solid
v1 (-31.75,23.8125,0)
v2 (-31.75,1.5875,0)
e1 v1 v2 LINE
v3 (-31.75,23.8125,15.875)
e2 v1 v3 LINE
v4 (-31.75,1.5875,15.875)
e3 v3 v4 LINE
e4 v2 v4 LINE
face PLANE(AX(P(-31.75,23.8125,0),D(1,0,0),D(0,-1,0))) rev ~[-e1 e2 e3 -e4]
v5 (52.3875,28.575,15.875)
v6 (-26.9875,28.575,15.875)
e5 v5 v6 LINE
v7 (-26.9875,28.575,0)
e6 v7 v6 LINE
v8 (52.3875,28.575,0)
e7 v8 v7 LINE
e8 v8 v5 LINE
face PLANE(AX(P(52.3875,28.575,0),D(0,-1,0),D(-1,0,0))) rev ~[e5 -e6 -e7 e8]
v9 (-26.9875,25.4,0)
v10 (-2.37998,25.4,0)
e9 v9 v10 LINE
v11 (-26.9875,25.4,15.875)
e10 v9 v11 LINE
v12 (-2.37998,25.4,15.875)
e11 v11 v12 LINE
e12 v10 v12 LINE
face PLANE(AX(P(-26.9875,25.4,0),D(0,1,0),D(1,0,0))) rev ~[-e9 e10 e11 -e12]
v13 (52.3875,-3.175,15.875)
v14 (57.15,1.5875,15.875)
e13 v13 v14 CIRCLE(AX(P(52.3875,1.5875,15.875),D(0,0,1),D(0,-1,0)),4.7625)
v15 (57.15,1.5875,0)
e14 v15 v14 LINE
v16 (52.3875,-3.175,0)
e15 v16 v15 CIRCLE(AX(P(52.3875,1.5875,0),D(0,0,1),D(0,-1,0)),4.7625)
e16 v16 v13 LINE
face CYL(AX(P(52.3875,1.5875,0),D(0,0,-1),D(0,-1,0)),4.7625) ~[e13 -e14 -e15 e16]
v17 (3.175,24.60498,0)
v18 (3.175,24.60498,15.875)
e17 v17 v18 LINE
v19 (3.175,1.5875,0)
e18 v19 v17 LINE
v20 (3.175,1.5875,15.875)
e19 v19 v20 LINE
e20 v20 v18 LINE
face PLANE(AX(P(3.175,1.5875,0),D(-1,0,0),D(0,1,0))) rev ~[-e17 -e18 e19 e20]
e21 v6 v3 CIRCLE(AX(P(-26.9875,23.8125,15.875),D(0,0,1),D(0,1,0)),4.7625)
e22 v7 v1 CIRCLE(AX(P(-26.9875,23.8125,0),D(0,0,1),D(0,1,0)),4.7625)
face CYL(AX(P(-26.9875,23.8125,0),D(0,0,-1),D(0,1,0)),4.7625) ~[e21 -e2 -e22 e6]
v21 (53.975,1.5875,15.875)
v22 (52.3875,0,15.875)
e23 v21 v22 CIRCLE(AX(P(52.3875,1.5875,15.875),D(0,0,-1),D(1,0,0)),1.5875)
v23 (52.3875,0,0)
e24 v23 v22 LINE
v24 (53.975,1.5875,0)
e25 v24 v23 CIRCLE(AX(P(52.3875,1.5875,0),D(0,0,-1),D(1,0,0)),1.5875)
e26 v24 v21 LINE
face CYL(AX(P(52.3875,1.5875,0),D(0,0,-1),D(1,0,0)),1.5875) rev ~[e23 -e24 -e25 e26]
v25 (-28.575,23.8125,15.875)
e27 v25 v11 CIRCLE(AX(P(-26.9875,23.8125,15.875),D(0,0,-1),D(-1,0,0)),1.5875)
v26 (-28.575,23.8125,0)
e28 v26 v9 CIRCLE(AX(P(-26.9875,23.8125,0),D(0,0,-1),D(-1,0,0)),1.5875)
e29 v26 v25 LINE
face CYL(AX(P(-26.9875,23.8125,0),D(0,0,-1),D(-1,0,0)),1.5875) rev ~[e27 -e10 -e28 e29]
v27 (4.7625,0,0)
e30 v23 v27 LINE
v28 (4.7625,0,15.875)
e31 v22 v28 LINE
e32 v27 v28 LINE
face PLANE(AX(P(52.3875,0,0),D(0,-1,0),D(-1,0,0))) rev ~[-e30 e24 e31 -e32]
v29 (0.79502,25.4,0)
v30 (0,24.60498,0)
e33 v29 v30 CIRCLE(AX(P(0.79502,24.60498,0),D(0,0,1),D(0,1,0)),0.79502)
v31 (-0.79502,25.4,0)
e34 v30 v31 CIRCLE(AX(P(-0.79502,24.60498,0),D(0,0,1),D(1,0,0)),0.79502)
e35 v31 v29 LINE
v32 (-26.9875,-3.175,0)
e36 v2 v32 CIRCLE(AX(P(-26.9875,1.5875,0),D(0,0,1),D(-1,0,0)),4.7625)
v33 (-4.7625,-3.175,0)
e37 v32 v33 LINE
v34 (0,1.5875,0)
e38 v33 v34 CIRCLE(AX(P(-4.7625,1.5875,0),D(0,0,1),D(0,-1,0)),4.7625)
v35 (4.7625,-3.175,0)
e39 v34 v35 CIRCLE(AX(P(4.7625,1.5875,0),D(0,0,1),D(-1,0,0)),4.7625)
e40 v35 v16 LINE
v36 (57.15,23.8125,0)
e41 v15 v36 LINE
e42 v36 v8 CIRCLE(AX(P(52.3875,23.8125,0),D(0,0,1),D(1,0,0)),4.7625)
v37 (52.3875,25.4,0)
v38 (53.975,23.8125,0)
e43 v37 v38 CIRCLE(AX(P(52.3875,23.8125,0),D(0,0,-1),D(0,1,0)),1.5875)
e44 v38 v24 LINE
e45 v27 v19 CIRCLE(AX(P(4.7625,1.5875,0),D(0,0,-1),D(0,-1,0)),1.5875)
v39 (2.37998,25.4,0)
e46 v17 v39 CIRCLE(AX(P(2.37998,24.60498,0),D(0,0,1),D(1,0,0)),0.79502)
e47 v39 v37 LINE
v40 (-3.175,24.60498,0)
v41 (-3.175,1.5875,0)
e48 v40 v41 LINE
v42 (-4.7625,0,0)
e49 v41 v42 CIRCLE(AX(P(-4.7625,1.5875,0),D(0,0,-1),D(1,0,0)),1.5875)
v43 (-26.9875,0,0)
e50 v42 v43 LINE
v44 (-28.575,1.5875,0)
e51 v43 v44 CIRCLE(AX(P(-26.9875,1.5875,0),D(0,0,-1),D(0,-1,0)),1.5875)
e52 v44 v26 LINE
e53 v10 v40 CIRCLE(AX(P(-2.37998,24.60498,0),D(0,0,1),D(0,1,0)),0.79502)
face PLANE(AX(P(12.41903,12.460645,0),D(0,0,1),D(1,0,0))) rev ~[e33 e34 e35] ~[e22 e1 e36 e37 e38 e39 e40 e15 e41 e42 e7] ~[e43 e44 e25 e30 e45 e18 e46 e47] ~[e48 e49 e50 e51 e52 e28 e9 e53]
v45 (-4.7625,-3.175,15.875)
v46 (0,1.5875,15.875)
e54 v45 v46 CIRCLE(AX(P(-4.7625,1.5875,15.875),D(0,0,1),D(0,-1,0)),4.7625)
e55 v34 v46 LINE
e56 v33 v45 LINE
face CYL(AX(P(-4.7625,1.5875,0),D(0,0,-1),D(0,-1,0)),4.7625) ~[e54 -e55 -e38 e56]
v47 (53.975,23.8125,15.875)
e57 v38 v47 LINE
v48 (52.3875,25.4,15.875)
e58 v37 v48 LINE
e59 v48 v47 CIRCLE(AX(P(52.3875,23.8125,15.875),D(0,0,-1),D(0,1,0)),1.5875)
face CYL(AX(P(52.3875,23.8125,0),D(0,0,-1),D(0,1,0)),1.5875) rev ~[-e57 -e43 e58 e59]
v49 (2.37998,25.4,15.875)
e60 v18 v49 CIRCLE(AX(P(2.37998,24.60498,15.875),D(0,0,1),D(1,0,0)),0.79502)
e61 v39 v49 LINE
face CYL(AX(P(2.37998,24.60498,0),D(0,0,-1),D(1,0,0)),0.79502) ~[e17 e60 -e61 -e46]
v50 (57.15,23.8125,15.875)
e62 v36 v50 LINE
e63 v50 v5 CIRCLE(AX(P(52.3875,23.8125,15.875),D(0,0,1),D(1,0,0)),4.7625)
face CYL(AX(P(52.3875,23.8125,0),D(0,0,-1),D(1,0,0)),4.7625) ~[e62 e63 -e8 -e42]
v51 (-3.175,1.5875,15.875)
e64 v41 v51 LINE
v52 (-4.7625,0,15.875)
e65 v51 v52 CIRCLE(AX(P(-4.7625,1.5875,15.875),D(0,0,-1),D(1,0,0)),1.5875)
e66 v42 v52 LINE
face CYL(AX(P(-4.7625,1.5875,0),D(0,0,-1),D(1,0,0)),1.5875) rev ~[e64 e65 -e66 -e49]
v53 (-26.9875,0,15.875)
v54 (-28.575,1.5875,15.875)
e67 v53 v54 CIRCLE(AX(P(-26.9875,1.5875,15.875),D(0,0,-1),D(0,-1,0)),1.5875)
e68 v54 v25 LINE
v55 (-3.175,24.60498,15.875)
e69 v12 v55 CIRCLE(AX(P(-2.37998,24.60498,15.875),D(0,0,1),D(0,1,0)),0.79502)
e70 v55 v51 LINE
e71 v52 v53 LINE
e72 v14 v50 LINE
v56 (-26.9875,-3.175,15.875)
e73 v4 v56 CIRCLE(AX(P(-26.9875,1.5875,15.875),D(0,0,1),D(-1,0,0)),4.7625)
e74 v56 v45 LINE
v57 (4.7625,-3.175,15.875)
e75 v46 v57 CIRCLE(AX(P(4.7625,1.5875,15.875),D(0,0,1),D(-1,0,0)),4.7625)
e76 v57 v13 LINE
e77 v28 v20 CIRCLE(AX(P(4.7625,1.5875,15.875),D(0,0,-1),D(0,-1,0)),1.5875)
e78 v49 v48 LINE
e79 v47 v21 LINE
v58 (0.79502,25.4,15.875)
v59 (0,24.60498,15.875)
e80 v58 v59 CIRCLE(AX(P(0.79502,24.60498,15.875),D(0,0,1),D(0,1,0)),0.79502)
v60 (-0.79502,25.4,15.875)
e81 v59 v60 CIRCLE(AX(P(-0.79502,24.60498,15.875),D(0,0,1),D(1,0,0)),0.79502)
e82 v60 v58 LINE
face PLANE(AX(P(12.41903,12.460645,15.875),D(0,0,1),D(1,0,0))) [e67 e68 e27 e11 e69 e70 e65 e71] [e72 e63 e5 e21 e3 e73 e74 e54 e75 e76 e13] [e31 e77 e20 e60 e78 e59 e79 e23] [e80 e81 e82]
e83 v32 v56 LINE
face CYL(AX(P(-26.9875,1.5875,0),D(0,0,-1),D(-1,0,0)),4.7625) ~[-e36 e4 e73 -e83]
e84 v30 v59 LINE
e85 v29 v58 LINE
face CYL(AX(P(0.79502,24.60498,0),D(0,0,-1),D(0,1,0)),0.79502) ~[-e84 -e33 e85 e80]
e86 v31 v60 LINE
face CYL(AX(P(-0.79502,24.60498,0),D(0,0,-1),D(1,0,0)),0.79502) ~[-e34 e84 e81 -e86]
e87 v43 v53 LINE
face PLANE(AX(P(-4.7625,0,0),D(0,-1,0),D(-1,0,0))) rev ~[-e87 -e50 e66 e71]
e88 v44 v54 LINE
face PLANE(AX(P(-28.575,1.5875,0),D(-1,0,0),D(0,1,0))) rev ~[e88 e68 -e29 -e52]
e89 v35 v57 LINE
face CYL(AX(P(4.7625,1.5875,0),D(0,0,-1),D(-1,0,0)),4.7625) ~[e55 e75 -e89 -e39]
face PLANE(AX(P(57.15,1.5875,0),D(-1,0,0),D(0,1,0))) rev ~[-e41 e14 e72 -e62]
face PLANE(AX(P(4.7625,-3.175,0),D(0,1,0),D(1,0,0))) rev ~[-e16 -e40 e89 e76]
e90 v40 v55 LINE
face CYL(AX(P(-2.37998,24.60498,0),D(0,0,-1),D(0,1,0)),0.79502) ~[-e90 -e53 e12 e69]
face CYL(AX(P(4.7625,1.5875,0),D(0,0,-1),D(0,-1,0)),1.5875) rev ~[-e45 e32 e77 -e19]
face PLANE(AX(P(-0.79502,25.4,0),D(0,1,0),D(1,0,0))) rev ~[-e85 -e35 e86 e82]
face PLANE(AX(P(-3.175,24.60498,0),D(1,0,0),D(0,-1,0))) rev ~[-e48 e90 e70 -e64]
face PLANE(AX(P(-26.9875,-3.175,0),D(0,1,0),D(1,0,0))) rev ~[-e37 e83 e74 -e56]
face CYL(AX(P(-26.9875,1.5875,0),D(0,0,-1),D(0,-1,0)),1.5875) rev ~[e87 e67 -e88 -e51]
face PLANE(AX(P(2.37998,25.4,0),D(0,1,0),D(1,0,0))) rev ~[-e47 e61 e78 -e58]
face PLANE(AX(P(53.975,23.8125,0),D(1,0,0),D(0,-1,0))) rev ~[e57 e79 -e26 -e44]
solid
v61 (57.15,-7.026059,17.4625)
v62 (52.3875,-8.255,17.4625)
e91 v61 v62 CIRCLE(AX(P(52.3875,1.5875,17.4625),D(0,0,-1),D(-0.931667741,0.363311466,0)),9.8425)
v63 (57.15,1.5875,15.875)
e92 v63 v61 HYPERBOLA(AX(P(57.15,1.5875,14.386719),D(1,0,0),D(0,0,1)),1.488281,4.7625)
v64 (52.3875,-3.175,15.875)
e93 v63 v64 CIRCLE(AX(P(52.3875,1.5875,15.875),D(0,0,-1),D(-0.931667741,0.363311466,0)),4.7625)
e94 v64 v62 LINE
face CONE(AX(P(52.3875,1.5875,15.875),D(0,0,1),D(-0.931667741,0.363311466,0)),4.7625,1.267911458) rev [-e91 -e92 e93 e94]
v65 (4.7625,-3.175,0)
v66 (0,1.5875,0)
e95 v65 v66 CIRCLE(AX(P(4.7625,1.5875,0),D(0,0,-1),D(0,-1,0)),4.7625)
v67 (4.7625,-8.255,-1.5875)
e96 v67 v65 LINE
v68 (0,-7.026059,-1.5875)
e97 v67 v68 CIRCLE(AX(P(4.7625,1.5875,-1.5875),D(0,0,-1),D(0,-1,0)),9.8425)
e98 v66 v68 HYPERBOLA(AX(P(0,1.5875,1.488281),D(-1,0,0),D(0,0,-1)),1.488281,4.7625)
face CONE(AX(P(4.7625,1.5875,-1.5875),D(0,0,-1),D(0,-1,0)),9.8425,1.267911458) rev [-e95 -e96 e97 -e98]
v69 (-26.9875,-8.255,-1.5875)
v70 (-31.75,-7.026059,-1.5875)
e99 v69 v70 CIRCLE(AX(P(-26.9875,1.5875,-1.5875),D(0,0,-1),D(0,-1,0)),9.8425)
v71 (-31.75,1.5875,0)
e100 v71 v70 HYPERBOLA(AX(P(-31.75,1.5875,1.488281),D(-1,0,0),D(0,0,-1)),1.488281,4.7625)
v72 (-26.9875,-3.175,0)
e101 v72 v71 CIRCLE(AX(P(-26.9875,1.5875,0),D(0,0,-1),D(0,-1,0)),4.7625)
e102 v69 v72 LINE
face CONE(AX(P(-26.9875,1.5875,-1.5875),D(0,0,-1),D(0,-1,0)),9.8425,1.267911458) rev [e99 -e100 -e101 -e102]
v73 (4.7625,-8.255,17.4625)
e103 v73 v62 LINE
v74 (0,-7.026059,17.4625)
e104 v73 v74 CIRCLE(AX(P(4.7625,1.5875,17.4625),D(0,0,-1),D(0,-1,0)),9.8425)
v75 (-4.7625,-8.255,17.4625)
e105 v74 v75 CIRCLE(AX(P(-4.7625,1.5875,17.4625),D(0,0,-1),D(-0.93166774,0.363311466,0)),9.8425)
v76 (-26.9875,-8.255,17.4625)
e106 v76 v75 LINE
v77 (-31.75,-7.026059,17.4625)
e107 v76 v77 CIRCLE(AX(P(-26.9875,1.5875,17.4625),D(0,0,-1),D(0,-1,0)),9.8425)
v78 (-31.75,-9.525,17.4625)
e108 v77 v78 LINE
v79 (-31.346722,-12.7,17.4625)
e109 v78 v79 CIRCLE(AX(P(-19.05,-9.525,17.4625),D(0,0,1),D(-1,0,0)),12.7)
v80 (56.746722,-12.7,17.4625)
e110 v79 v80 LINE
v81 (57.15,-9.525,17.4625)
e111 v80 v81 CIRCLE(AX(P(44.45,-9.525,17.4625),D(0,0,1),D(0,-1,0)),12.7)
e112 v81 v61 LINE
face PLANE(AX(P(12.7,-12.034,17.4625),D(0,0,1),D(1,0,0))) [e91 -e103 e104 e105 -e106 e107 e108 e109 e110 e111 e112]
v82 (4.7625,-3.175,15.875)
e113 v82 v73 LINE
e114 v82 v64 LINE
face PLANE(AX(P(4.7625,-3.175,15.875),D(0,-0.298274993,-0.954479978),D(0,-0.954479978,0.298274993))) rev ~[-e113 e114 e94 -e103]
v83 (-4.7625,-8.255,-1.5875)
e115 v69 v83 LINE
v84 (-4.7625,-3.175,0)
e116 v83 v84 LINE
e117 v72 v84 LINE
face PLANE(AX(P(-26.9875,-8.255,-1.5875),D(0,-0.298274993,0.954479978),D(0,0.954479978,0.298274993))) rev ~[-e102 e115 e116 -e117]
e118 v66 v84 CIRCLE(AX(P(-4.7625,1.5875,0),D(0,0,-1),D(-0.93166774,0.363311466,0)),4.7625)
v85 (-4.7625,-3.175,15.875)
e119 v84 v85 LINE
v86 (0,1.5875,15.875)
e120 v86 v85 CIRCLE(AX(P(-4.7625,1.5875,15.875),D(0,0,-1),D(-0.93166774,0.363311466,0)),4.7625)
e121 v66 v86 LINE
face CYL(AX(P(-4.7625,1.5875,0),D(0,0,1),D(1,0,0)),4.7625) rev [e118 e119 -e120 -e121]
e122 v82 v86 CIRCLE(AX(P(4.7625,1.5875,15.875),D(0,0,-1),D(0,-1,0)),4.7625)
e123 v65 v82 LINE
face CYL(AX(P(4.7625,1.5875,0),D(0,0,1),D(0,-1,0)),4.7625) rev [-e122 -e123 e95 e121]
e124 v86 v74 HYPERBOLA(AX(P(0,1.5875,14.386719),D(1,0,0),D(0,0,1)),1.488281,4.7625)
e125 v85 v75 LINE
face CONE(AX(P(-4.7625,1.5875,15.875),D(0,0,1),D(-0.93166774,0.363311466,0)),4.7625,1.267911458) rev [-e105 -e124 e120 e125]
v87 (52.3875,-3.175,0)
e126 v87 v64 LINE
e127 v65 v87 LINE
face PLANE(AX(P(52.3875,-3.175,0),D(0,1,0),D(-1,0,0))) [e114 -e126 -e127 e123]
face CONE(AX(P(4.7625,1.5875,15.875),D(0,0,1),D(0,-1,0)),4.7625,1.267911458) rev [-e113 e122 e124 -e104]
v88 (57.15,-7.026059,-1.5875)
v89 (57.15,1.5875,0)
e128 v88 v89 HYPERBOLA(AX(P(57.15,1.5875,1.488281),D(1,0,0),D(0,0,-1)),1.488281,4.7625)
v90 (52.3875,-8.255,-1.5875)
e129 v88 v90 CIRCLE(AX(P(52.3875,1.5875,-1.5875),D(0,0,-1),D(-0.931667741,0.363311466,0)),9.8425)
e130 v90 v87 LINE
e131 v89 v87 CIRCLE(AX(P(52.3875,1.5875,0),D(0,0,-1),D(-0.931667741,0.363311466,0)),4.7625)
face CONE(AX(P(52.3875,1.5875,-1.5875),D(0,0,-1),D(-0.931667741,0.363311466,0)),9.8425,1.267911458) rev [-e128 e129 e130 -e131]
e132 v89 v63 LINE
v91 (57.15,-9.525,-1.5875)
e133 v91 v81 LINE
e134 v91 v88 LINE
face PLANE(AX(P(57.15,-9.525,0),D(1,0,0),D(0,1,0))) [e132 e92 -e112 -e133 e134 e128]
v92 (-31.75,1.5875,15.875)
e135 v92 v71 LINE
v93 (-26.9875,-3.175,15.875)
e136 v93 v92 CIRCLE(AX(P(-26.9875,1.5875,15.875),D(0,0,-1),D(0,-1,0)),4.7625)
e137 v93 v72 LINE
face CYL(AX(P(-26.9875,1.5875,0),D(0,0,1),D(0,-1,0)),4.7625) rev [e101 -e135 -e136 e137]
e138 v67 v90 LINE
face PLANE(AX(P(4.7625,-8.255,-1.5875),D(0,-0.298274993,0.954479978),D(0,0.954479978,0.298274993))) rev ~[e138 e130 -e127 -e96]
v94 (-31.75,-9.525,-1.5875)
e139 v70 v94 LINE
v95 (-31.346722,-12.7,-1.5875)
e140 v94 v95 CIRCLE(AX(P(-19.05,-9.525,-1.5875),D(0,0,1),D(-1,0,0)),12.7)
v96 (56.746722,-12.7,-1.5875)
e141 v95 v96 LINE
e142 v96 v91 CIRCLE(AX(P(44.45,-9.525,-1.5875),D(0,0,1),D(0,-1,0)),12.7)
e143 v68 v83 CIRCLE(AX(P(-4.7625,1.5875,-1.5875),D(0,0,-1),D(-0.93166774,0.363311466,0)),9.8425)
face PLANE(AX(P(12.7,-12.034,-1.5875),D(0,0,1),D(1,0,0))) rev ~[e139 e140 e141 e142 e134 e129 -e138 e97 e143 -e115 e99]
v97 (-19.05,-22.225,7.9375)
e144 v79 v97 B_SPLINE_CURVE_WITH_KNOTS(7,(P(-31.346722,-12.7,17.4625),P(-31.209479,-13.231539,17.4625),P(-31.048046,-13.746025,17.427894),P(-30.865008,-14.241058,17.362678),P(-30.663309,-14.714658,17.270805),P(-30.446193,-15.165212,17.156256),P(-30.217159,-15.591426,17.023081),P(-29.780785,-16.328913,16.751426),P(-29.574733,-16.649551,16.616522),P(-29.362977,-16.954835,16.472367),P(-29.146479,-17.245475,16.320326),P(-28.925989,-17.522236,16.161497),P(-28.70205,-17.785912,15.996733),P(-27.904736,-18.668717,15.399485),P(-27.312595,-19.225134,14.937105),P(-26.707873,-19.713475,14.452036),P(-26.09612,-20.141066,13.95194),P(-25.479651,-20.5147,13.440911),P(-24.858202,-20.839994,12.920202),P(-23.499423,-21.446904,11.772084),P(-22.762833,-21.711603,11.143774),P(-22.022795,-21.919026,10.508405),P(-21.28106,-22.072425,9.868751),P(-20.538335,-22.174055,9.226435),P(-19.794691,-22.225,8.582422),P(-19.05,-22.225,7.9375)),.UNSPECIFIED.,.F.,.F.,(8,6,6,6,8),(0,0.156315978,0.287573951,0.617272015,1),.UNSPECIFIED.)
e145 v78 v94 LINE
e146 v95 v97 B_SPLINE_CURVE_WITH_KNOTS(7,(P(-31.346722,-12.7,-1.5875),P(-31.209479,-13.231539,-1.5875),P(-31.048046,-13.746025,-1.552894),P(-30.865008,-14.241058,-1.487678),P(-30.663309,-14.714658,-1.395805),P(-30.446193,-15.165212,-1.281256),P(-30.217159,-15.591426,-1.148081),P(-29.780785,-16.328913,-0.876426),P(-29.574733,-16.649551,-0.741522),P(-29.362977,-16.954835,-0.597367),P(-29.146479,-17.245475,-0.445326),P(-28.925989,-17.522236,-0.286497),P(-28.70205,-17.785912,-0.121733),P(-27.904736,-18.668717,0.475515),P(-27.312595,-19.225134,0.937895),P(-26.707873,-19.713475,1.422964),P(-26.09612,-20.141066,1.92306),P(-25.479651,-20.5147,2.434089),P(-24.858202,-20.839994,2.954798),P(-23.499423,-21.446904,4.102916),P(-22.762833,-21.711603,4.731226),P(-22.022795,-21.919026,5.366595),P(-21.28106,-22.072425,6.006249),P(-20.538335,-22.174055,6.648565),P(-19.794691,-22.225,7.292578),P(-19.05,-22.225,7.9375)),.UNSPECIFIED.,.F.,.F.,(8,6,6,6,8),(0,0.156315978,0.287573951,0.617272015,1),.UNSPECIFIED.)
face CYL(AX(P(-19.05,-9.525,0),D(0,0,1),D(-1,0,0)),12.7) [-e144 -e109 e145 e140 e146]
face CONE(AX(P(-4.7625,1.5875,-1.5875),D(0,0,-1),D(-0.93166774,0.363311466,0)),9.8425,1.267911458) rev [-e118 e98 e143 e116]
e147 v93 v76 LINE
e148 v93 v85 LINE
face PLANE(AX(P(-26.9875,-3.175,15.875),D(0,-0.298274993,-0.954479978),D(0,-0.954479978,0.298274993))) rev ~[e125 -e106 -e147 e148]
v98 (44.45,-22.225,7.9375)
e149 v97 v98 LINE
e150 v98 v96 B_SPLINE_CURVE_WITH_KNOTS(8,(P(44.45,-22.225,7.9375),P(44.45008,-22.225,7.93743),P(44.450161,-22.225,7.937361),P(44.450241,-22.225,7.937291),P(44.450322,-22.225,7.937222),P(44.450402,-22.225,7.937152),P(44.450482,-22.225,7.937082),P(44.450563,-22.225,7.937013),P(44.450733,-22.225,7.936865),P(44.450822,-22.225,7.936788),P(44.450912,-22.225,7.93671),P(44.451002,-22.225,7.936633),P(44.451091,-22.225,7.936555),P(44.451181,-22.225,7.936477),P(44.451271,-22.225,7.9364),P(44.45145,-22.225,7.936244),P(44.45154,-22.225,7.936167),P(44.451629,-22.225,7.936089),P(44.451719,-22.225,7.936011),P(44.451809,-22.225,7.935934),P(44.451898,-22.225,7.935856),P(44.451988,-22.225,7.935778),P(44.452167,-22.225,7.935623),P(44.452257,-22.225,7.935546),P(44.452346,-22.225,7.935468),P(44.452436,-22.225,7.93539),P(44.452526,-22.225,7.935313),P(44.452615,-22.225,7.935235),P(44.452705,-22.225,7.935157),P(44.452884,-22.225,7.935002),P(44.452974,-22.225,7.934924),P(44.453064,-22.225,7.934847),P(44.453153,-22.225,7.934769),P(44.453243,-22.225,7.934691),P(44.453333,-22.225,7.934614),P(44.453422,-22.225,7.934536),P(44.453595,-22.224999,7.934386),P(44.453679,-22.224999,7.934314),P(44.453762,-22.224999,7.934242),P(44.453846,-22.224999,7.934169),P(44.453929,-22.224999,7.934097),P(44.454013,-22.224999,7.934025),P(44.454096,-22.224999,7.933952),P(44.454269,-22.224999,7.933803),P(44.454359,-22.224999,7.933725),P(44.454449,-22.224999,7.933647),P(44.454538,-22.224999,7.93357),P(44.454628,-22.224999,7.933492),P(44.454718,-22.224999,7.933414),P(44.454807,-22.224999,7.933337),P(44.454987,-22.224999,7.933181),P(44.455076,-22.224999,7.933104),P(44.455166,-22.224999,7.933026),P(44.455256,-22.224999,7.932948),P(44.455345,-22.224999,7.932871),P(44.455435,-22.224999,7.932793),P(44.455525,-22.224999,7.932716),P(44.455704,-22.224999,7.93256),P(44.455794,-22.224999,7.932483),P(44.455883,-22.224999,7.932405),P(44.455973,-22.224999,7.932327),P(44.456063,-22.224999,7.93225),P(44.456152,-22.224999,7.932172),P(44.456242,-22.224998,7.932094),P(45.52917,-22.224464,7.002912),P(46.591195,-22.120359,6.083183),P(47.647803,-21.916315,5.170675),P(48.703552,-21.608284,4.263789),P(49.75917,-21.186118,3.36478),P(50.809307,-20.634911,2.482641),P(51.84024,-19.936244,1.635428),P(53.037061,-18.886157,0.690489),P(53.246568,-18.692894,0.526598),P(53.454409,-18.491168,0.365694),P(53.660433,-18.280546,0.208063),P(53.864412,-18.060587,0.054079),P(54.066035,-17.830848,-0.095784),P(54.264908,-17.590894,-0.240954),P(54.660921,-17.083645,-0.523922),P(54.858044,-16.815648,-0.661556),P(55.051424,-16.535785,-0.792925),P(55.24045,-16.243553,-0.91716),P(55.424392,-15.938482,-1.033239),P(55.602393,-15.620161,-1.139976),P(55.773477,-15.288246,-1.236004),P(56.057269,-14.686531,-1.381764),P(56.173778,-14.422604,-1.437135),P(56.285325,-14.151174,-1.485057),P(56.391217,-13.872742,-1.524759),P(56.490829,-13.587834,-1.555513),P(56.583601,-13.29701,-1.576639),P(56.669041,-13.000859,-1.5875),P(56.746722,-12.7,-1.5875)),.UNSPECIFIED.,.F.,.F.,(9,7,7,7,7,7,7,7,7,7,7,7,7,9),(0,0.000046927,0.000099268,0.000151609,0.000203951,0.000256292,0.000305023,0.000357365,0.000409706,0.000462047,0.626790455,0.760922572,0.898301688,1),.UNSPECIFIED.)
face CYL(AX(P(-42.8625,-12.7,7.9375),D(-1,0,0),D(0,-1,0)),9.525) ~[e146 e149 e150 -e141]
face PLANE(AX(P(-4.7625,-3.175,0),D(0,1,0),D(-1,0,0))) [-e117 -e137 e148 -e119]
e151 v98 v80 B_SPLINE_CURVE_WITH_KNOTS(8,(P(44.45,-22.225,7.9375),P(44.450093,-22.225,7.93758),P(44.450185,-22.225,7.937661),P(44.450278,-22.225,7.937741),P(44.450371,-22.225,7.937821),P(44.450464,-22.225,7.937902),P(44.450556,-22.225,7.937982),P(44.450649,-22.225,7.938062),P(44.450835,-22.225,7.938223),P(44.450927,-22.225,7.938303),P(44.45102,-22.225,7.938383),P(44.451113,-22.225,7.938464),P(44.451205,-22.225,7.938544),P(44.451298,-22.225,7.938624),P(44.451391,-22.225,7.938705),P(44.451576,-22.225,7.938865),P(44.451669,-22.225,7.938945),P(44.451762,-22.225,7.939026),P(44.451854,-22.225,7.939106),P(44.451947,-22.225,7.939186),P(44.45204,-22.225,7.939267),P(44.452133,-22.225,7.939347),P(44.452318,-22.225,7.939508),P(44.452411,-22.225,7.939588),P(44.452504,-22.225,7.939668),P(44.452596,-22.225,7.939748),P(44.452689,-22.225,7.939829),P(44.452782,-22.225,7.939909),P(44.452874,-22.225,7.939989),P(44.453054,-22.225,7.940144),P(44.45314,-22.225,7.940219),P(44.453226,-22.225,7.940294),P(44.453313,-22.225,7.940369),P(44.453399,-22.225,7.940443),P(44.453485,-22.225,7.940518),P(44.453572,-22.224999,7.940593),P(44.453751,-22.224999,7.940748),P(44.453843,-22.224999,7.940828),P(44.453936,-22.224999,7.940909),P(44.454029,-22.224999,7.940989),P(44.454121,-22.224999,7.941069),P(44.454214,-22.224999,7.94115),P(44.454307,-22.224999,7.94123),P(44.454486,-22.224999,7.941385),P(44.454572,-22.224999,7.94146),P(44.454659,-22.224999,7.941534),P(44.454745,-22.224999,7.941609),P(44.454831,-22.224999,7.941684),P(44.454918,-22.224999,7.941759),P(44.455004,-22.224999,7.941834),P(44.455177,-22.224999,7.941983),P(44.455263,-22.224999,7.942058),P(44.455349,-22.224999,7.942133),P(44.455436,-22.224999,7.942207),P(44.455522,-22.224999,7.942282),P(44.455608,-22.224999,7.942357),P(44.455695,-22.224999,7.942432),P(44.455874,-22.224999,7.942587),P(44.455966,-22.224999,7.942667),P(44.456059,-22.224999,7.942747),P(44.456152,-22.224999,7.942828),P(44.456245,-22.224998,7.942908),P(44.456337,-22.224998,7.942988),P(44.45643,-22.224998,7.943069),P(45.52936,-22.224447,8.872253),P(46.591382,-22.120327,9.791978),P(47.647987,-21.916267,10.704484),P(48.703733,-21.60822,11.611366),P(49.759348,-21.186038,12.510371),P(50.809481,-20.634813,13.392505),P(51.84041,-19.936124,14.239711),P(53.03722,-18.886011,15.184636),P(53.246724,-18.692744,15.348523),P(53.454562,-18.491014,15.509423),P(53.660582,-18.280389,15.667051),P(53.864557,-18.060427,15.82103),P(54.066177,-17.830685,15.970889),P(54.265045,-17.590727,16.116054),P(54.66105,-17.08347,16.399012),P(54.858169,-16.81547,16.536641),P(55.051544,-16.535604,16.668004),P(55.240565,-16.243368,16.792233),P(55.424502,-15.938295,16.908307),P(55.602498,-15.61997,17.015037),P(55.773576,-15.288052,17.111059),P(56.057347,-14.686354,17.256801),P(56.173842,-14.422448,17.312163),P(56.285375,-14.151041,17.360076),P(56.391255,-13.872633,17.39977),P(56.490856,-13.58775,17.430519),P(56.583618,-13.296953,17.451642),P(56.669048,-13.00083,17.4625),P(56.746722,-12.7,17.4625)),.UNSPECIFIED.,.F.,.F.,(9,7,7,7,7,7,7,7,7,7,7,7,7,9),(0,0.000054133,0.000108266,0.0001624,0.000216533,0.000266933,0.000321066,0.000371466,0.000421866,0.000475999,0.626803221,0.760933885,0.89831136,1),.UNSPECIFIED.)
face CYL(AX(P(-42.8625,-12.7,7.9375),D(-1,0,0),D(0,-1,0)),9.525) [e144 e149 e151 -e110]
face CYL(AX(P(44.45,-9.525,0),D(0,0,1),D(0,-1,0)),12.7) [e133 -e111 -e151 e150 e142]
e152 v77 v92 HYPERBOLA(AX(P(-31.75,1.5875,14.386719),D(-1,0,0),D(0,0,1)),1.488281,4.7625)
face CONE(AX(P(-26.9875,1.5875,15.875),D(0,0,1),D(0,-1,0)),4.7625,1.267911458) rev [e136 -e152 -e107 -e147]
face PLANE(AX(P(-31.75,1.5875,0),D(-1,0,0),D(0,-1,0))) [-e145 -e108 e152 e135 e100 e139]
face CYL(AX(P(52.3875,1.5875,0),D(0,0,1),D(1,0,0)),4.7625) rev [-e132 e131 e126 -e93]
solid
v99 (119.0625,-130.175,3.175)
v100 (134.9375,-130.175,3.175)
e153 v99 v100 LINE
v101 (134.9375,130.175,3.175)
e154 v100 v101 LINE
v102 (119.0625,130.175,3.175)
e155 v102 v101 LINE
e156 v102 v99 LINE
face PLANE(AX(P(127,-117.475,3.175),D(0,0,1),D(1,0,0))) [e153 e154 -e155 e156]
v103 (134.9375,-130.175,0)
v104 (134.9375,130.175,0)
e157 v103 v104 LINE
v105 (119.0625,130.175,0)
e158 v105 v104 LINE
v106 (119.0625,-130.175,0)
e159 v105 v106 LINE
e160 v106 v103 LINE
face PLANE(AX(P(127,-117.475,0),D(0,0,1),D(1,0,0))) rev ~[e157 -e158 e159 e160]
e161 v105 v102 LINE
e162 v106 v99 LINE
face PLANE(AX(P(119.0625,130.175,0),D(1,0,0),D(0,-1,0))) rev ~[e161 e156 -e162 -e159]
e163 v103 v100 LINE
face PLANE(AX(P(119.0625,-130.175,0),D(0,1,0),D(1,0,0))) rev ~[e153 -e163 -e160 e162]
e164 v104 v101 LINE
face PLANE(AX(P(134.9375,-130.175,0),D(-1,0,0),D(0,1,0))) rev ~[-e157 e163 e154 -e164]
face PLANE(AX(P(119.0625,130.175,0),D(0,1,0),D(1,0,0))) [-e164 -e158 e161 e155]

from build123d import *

# Parameters (mm, degrees)
F1_DEPTH      = 15.875
F3_DEPTH      = 17.4625
F3_DEPTH_BACK = 1.5875
F4_T1_DEPTH   = 22.225
F4_T3_DEPTH   = 47.625
F4_T6_ANGLE   = 248.6962956801
F4_T8_ANGLE   = 248.6962956801
F4_T10_ANGLE  = 248.6962956801
F4_T12_ANGLE  = 248.6962956801
F4_T14_ANGLE  = 248.6962956801
F4_T16_ANGLE  = 248.6962956801
F4_T18_ANGLE  = 248.6962956801
F4_T20_ANGLE  = 248.6962956801
F6_T1_DEPTH   = 111.125
F7_W          = 15.875
F7_H          = 25.4
F7_H_2        = 82.55
F7_H_3        = 50.8
F8_DEPTH      = 3.175


# Not quite as in the source:
# - a fillet or chamfer that OpenCascade refuses, or shapes differently, is made with other operations: its cross-section is extruded or revolved along the edge and cut away or added
# - two fillets or chamfers of one size are made in one step
# - the program builds the solid bodies; features that only make, move or delete a surface that nothing else refers to are left out


with BuildPart() as f1:
    # F0 (on Top) → F1 (new body)
    with BuildSketch(Plane.XY):
        with BuildLine():
            ThreePointArc((-4.7625, -3.175), (-1.3949039546, -1.7800960454), (0, 1.5875))
            ThreePointArc((0, 1.5875), (1.3949039546, -1.7800960454), (4.7625, -3.175))
            Line((4.7625, -3.175), (52.3875, -3.175))
            ThreePointArc((52.3875, -3.175), (55.7550960454, -1.7800960454), (57.15, 1.5875))
            Line((57.15, 1.5875), (57.15, 23.8125))
            ThreePointArc((57.15, 23.8125), (55.7550960454, 27.1800960454), (52.3875, 28.575))
            Line((52.3875, 28.575), (-26.9875, 28.575))
            ThreePointArc((-26.9875, 28.575), (-30.3550960454, 27.1800960454), (-31.75, 23.8125))
            Line((-31.75, 23.8125), (-31.75, 1.5875))
            ThreePointArc((-31.75, 1.5875), (-30.3550960454, -1.7800960454), (-26.9875, -3.175))
            Line((-26.9875, -3.175), (-4.7625, -3.175))
        make_face()
        with BuildLine():
            Line((-4.7625, 0), (-26.9875, 0))
            ThreePointArc((-26.9875, 0), (-28.1100320151, 0.4649679849), (-28.575, 1.5875))
            Line((-28.575, 1.5875), (-28.575, 23.8125))
            ThreePointArc((-28.575, 23.8125), (-28.1100320151, 24.9350320151), (-26.9875, 25.4))
            Line((-26.9875, 25.4), (-2.37998, 25.4))
            ThreePointArc((-2.37998, 25.4), (-2.9421440332, 25.1671440332), (-3.175, 24.60498))
            Line((-3.175, 24.60498), (-3.175, 1.5875))
            ThreePointArc((-3.175, 1.5875), (-3.6399679849, 0.4649679849), (-4.7625, 0))
        make_face(mode=Mode.SUBTRACT)
        with BuildLine():
            ThreePointArc((0, 24.60498), (-0.2328559668, 25.1671440332), (-0.79502, 25.4))
            Line((-0.79502, 25.4), (0.79502, 25.4))
            ThreePointArc((0.79502, 25.4), (0.2328559668, 25.1671440332), (0, 24.60498))
        make_face(mode=Mode.SUBTRACT)
        with BuildLine():
            ThreePointArc((3.175, 24.60498), (2.9421440332, 25.1671440332), (2.37998, 25.4))
            Line((2.37998, 25.4), (52.3875, 25.4))
            ThreePointArc((52.3875, 25.4), (53.5100320151, 24.9350320151), (53.975, 23.8125))
            Line((53.975, 23.8125), (53.975, 1.5875))
            ThreePointArc((53.975, 1.5875), (53.5100320151, 0.4649679849), (52.3875, 0))
            Line((52.3875, 0), (4.7625, 0))
            ThreePointArc((4.7625, 0), (3.6399679849, 0.4649679849), (3.175, 1.5875))
            Line((3.175, 1.5875), (3.175, 24.60498))
        make_face(mode=Mode.SUBTRACT)
    extrude(amount=F1_DEPTH)


with BuildPart() as f3:
    # F0 (on Top) → F3 (new body, two sides)
    with BuildSketch(Plane.XY) as f3_sk:
        with BuildLine():
            Line((52.3875, -3.175), (4.7625, -3.175))
            Line((4.7625, -3.175), (-4.7625, -3.175))
            Line((-4.7625, -3.175), (-26.9875, -3.175))
            Line((-26.9875, -3.175), (-31.75, -3.175))
            Line((-31.75, -3.175), (-31.75, -9.525))
            ThreePointArc((-31.75, -9.525), (-28.0302561211, -18.5052561211), (-19.05, -22.225))
            Line((-19.05, -22.225), (44.45, -22.225))
            ThreePointArc((44.45, -22.225), (53.4302561211, -18.5052561211), (57.15, -9.525))
            Line((57.15, -9.525), (57.15, -3.175))
            Line((57.15, -3.175), (52.3875, -3.175))
        make_face()
        with BuildLine():
            ThreePointArc((4.7625, -3.175), (1.3949039546, -1.7800960454), (0, 1.5875))
            ThreePointArc((0, 1.5875), (-1.3949039546, -1.7800960454), (-4.7625, -3.175))
            Line((-4.7625, -3.175), (4.7625, -3.175))
        make_face()
        with BuildLine():
            ThreePointArc((57.15, 1.5875), (55.7550960454, -1.7800960454), (52.3875, -3.175))
            Line((52.3875, -3.175), (57.15, -3.175))
            Line((57.15, -3.175), (57.15, 1.5875))
        make_face()
        with BuildLine():
            Line((-31.75, -3.175), (-26.9875, -3.175))
            ThreePointArc((-26.9875, -3.175), (-30.3550960454, -1.7800960454), (-31.75, 1.5875))
            Line((-31.75, 1.5875), (-31.75, -3.175))
        make_face()
    extrude(amount=F3_DEPTH)
    extrude(f3_sk.sketch, amount=-F3_DEPTH_BACK)

    # F4: chamfer of 1.5875 x 5.08 on 8 edges, made by hand

    # F4_s2 → F4_t1 (cut)
    with BuildSketch(Plane.YZ.offset(-26.9875)):
        Polygon((-3.175, 15.875), (-8.255, 17.4625), (-3.175, 17.4625), align=None)
        Polygon((-8.255, -1.5875), (-3.175, 0), (-3.175, -1.5875), align=None)
    extrude(amount=F4_T1_DEPTH, mode=Mode.SUBTRACT)

    # F4_s4 → F4_t3 (cut)
    with BuildSketch(Plane.YZ.offset(4.7625)):
        Polygon((-3.175, 15.875), (-8.255, 17.4625), (-3.175, 17.4625), align=None)
        Polygon((-8.255, -1.5875), (-3.175, 0), (-3.175, -1.5875), align=None)
    extrude(amount=F4_T3_DEPTH, mode=Mode.SUBTRACT)

    # F4_s5 → F4_t6 (revolve, cut)
    with BuildSketch(Plane.YZ.offset(-26.9875)):
        Polygon((-3.175, 15.875), (-8.255, 17.4625), (-3.175, 17.4625), align=None)
    revolve(axis=Axis((-26.9875, 1.5875, 17.4625), (0, 0, -1)), revolution_arc=F4_T6_ANGLE, mode=Mode.SUBTRACT)

    # F4_s7 → F4_t8 (revolve, cut)
    with BuildSketch(Plane.YZ.offset(4.7625)):
        Polygon((-3.175, 15.875), (-8.255, 17.4625), (-3.175, 17.4625), align=None)
    revolve(axis=Axis((4.7625, 1.5875, 17.4625), (0, 0, -1)), revolution_arc=F4_T8_ANGLE, mode=Mode.SUBTRACT)

    # F4_s9 → F4_t10 (revolve, cut)
    with BuildSketch(Plane(origin=(-0.0912813949, -0.2340799532, 0), x_dir=(0, 0, 1), z_dir=(-0.363311466, -0.9316677405, 0))):
        Polygon((15.875, 9.7763245664), (17.4625, 14.8563245664), (17.4625, 9.7763245664), align=None)
    revolve(axis=Axis((-4.7625, 1.5875, 17.4625), (0, 0, -1)), revolution_arc=F4_T10_ANGLE, mode=Mode.SUBTRACT)

    # F4_s11 → F4_t12 (revolve, cut)
    with BuildSketch(Plane(origin=(7.452245502, 19.1103705201, 0), x_dir=(0, 0, 1), z_dir=(-0.363311466, -0.9316677405, 0))):
        Polygon((15.875, -43.4684868037), (17.4625, -38.3884868037), (17.4625, -43.4684868037), align=None)
    revolve(axis=Axis((52.3875, 1.5875, 17.4625), (0, 0, -1)), revolution_arc=F4_T12_ANGLE, mode=Mode.SUBTRACT)

    # F4_s13 → F4_t14 (revolve, cut)
    with BuildSketch(Plane(origin=(-0.0912813949, -0.2340799532, 0), x_dir=(0, 0, 1), z_dir=(-0.363311466, -0.9316677405, 0))):
        Polygon((-1.5875, 14.8563245664), (0, 9.7763245664), (-1.5875, 9.7763245664), align=None)
    revolve(axis=Axis((-4.7625, 1.5875, -1.5875), (0, 0, -1)), revolution_arc=F4_T14_ANGLE, mode=Mode.SUBTRACT)

    # F4_s15 → F4_t16 (revolve, cut)
    with BuildSketch(Plane.YZ.offset(-26.9875)):
        Polygon((-8.255, -1.5875), (-3.175, 0), (-3.175, -1.5875), align=None)
    revolve(axis=Axis((-26.9875, 1.5875, -1.5875), (0, 0, -1)), revolution_arc=F4_T16_ANGLE, mode=Mode.SUBTRACT)

    # F4_s17 → F4_t18 (revolve, cut)
    with BuildSketch(Plane(origin=(7.452245502, 19.1103705201, 0), x_dir=(0, 0, 1), z_dir=(-0.363311466, -0.9316677405, 0))):
        Polygon((-1.5875, -38.3884868037), (0, -43.4684868037), (-1.5875, -43.4684868037), align=None)
    revolve(axis=Axis((52.3875, 1.5875, -1.5875), (0, 0, -1)), revolution_arc=F4_T18_ANGLE, mode=Mode.SUBTRACT)

    # F4_s19 → F4_t20 (revolve, cut)
    with BuildSketch(Plane.YZ.offset(4.7625)):
        Polygon((-8.255, -1.5875), (-3.175, 0), (-3.175, -1.5875), align=None)
    revolve(axis=Axis((4.7625, 1.5875, -1.5875), (0, 0, -1)), revolution_arc=F4_T20_ANGLE, mode=Mode.SUBTRACT)

    # F6: fillet of radius 9.525 on 4 edges, made by hand

    # F6_s2 → F6_t1 (cut)
    with BuildSketch(Plane.YZ.offset(-42.8625)):
        with BuildLine():
            ThreePointArc((-22.225, 7.9375), (-19.4351920908, 14.6726920908), (-12.7, 17.4625))
            Line((-12.7, 17.4625), (-22.225, 17.4625))
            Line((-22.225, 17.4625), (-22.225, 7.9375))
        make_face()
        with BuildLine():
            ThreePointArc((-22.225, 7.9375), (-19.4351920908, 1.2023079092), (-12.7, -1.5875))
            Line((-12.7, -1.5875), (-22.225, -1.5875))
            Line((-22.225, -1.5875), (-22.225, 7.9375))
        make_face()
    extrude(amount=F6_T1_DEPTH, mode=Mode.SUBTRACT)


with BuildPart() as f8:
    # F7 (on Top) → F8 (new body)
    with BuildSketch(Plane.XY):
        with Locations((127, -117.475)):
            Rectangle(F7_W, F7_H)
        with Locations((127, -92.075)):
            Rectangle(F7_W, F7_H)
        with Locations((127, -66.675)):
            Rectangle(F7_W, F7_H)
        with Locations((127, -12.7)):
            Rectangle(F7_W, F7_H_2)
        with Locations((127, 41.275)):
            Rectangle(F7_W, F7_H)
        with Locations((127, 79.375)):
            Rectangle(F7_W, F7_H_3)
        with Locations((127, 117.475)):
            Rectangle(F7_W, F7_H)
    extrude(amount=F8_DEPTH)


solid = Compound([f1.part, f3.part, f8.part])
